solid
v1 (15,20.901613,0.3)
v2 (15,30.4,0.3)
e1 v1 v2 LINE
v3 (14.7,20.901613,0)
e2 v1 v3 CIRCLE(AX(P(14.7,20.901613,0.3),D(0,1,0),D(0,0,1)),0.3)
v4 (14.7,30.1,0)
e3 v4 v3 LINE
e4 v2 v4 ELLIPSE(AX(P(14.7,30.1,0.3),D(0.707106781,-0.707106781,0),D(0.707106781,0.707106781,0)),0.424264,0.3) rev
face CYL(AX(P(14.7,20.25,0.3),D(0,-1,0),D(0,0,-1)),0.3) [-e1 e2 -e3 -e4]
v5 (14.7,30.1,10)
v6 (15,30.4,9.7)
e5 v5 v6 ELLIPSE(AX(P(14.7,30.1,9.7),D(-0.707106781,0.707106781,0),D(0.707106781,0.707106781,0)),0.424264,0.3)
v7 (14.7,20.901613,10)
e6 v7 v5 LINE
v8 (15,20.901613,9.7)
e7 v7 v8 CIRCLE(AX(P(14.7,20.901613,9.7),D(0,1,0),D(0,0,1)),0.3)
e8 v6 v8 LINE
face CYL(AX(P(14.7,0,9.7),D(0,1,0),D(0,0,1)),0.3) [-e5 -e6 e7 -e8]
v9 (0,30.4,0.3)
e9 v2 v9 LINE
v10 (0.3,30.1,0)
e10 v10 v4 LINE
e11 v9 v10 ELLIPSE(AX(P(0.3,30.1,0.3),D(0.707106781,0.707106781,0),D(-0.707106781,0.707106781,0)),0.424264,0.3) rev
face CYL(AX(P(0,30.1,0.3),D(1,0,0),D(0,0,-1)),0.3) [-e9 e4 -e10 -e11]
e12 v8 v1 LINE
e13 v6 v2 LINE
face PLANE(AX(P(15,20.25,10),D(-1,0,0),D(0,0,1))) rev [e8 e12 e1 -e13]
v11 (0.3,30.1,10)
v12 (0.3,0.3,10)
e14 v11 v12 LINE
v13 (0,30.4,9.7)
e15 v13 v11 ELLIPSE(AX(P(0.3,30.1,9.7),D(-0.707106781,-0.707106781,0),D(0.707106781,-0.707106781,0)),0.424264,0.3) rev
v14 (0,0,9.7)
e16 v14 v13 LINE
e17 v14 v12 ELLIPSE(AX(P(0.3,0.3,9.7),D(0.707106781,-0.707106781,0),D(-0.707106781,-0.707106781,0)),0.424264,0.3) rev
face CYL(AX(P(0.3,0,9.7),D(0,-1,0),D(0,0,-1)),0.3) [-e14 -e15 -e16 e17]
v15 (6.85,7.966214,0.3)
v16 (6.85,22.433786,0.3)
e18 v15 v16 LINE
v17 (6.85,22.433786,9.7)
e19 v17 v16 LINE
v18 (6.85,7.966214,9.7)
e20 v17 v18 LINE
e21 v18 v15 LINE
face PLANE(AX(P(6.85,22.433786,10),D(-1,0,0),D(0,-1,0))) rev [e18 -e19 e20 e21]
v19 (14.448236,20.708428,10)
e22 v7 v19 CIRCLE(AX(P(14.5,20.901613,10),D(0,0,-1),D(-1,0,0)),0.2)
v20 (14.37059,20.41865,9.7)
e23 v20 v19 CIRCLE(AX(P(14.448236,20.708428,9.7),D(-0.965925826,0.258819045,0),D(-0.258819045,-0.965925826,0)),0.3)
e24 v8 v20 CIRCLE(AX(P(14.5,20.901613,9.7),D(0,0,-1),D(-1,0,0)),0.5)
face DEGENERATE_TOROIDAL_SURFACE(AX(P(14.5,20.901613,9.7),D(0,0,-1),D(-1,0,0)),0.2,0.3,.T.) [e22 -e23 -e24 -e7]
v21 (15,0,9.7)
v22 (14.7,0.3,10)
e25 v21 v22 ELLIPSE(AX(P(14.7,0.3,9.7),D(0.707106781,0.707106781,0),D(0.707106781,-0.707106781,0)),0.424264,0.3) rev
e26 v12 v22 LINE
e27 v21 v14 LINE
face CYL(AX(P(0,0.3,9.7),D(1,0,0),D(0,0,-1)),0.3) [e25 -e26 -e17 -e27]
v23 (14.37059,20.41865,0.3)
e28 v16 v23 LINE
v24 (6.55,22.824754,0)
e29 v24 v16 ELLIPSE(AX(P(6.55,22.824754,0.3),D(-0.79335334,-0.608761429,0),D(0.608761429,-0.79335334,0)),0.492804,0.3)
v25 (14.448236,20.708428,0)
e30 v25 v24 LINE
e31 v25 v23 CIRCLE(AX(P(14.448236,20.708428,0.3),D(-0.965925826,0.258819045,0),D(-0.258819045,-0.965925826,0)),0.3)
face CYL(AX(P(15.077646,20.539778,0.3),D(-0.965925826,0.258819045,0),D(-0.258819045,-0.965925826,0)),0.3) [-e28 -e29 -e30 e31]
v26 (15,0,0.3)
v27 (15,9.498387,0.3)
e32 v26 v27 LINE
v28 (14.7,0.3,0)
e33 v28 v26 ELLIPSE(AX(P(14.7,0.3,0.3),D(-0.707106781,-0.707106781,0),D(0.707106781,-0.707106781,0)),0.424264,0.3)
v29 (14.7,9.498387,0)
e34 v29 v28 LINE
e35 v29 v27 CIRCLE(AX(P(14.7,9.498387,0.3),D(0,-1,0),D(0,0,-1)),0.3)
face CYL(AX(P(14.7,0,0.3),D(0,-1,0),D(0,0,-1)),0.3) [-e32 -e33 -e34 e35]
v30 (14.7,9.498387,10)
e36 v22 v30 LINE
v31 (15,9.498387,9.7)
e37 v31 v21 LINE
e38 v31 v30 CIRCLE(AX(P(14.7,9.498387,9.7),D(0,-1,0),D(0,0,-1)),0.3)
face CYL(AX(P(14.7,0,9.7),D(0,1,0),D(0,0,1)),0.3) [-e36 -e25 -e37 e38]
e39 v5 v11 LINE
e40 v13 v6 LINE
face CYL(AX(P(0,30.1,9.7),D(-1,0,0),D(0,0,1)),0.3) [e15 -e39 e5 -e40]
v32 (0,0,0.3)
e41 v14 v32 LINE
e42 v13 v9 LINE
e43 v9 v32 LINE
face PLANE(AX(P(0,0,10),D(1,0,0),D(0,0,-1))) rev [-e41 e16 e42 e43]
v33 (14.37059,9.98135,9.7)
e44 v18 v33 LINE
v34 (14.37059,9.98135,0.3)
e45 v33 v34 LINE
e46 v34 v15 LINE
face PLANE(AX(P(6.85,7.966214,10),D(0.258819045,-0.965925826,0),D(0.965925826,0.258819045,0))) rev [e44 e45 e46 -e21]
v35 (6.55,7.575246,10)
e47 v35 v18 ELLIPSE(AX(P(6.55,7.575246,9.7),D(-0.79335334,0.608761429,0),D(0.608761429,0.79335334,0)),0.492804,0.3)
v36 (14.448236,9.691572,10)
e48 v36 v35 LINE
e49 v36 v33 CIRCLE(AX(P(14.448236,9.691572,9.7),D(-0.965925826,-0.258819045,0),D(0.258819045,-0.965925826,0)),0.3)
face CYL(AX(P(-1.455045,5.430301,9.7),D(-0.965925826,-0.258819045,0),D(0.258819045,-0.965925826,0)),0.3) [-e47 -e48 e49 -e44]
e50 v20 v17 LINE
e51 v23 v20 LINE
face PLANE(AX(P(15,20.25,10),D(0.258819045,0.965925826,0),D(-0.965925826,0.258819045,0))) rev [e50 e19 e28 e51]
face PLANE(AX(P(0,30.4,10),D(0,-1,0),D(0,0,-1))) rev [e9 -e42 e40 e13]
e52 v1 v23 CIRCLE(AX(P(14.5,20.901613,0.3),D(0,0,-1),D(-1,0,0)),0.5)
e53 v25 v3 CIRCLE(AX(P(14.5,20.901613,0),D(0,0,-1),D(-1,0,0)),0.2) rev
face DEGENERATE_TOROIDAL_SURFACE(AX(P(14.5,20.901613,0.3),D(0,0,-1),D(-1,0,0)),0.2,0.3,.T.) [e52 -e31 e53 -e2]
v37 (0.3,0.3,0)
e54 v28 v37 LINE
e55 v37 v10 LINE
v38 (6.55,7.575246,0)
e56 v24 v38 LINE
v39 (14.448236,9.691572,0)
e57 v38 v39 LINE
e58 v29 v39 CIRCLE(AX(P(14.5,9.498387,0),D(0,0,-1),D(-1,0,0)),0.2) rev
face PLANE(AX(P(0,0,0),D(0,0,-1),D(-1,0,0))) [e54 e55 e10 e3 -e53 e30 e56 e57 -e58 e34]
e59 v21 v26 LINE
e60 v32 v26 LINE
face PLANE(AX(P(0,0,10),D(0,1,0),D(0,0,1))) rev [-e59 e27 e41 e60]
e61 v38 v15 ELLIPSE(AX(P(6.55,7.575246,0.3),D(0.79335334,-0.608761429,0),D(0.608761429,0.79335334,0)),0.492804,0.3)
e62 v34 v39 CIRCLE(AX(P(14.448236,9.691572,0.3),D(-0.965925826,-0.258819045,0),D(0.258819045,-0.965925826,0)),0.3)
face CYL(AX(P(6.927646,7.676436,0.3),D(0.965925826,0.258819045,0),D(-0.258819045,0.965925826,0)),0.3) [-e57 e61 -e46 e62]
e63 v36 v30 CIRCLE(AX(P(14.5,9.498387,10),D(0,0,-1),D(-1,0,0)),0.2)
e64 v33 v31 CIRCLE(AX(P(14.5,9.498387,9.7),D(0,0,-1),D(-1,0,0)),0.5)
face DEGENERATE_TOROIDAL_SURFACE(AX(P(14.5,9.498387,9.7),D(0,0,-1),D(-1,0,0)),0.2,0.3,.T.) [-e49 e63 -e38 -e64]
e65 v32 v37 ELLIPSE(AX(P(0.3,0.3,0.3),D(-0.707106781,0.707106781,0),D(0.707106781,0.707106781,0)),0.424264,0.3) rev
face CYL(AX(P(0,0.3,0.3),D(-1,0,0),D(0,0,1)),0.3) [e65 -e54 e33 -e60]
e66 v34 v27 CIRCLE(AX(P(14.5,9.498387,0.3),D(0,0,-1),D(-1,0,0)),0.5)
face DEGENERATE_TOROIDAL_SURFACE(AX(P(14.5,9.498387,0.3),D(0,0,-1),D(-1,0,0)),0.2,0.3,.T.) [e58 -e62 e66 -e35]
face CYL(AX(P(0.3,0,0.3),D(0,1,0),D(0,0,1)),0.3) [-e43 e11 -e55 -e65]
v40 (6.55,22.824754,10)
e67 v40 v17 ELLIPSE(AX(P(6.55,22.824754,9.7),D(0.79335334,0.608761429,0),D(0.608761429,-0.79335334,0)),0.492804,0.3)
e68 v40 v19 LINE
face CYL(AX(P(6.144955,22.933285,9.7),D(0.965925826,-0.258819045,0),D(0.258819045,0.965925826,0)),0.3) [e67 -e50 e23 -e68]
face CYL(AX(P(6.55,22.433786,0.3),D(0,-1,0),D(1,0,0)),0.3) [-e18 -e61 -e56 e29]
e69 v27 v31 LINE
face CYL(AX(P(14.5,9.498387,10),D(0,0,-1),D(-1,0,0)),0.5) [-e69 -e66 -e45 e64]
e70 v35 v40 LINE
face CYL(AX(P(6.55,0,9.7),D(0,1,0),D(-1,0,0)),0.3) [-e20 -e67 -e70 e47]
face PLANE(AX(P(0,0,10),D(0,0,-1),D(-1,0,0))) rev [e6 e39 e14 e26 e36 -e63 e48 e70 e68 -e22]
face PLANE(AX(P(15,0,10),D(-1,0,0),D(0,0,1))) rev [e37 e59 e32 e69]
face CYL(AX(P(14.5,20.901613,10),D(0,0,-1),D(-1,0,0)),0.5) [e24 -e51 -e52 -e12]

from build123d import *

# Parameters (mm, degrees)
BOSS_EXTRU_1_DEPTH = 10
CONG_1_R           = 0.3
CONG_2_R           = 0.5


with BuildPart() as part:
    # Esquisse1 → Boss.-Extru.1 (new body)
    with BuildSketch(Plane.XY):
        Polygon((15, 20.25), (6.85, 22.433785918), (6.85, 7.966214082), (15, 10.15), (15, 0), (0, 0), (0, 30.4), (15, 30.4), align=None)
    extrude(amount=BOSS_EXTRU_1_DEPTH)

    # Congé1
    cong_1_edges = [part.edges().sort_by_distance(p)[0] for p in [
        (10.925, 9.058107041, 0),
        (15, 5.075, 0),
        (7.5, 0, 0),
        (0, 15.2, 0),
        (15, 5.075, 10),
        (10.925, 9.058107041, 10),
        (6.85, 15.2, 10),
        (10.925, 21.341892959, 10),
        (15, 25.325, 10),
        (7.5, 30.4, 10),
        (0, 15.2, 10),
        (7.5, 30.4, 0),
        (7.5, 0, 10),
        (15, 25.325, 0),
        (10.925, 21.341892959, 0),
        (6.85, 15.2, 0),
    ]]
    fillet(cong_1_edges, radius=CONG_1_R)

    # Congé2
    # the kernel refuses this fillet: 0.5 mm, written as the material it takes off along each edge
    with BuildSketch(Plane(origin=(14.5, 20.901612686, 0), x_dir=(1, 0, 0), z_dir=(0, 1, 0))) as cong_2_piece_1:
        with BuildLine():
            CenterArc((0.2, -0.3), 0.3, 0, 90)
            Line((0.5, -0.3), (0.5, 0))
            Line((0.5, 0), (0.2, 0))
        make_face()
    revolve(axis=Axis((14.5, 20.901612686, 0), (0, 0, -1)), revolution_arc=105, mode=Mode.SUBTRACT)
    with BuildSketch(Plane(origin=(14.5, 9.498387314, 0), x_dir=(-0.2588190451025178, 0.9659258262890691, 0), z_dir=(-0.9659258262890691, -0.2588190451025178, 0))) as cong_2_piece_2:
        with BuildLine():
            CenterArc((0.2, -0.3), 0.3, 0, 90)
            Line((0.5, -0.3), (0.5, 0))
            Line((0.5, 0), (0.2, 0))
        make_face()
    revolve(axis=Axis((14.5, 9.498387314, 0), (0, 0, -1)), revolution_arc=105, mode=Mode.SUBTRACT)
    with BuildSketch(Plane(origin=(14.5, 9.498387314, 10), x_dir=(1, 0, 0), z_dir=(0, -1, 0))) as cong_2_piece_3:
        with BuildLine():
            CenterArc((0.2, -0.3), 0.3, 0, 90)
            Line((0.5, -0.3), (0.5, 0))
            Line((0.5, 0), (0.2, 0))
        make_face()
    revolve(axis=Axis((14.5, 9.498387314, 10), (0, 0, 1)), revolution_arc=105, mode=Mode.SUBTRACT)
    with BuildSketch(Plane(origin=(14.5, 20.901612686, 10), x_dir=(-0.2588190451025179, -0.9659258262890691, 0), z_dir=(-0.9659258262890691, 0.2588190451025179, 0))) as cong_2_piece_4:
        with BuildLine():
            CenterArc((0.2, -0.3), 0.3, 0, 90)
            Line((0.5, -0.3), (0.5, 0))
            Line((0.5, 0), (0.2, 0))
        make_face()
    revolve(axis=Axis((14.5, 20.901612686, 10), (0, 0, 1)), revolution_arc=105, mode=Mode.SUBTRACT)
    with BuildSketch(Plane(origin=(15, 10.15, 0), x_dir=(-0.9659258262890693, -0.25881904510251724, 0), z_dir=(0, 0, 1))) as cong_2_piece_5:
        with BuildLine():
            CenterArc((CONG_2_R * 1.30322537284, CONG_2_R), CONG_2_R, 165, 105)
            Line((CONG_2_R * 0.337299546552, CONG_2_R * 1.2588190451), (0, 0))
            Line((0, 0), (CONG_2_R * 1.30322537284, 0))
        make_face()
    extrude(amount=10, mode=Mode.SUBTRACT)
    with BuildSketch(Plane(origin=(15, 20.25, 0), x_dir=(-0.9659258262890691, 0.2588190451025179, 0), z_dir=(0, 0, 1))) as cong_2_piece_6:
        with BuildLine():
            CenterArc((CONG_2_R * 1.30322537284, -CONG_2_R), CONG_2_R, 90, 105)
            Line((CONG_2_R * 0.337299546552, -CONG_2_R * 1.2588190451), (0, 0))
            Line((0, 0), (CONG_2_R * 1.30322537284, 0))
        make_face()
    extrude(amount=10, mode=Mode.SUBTRACT)


solid = part.part
